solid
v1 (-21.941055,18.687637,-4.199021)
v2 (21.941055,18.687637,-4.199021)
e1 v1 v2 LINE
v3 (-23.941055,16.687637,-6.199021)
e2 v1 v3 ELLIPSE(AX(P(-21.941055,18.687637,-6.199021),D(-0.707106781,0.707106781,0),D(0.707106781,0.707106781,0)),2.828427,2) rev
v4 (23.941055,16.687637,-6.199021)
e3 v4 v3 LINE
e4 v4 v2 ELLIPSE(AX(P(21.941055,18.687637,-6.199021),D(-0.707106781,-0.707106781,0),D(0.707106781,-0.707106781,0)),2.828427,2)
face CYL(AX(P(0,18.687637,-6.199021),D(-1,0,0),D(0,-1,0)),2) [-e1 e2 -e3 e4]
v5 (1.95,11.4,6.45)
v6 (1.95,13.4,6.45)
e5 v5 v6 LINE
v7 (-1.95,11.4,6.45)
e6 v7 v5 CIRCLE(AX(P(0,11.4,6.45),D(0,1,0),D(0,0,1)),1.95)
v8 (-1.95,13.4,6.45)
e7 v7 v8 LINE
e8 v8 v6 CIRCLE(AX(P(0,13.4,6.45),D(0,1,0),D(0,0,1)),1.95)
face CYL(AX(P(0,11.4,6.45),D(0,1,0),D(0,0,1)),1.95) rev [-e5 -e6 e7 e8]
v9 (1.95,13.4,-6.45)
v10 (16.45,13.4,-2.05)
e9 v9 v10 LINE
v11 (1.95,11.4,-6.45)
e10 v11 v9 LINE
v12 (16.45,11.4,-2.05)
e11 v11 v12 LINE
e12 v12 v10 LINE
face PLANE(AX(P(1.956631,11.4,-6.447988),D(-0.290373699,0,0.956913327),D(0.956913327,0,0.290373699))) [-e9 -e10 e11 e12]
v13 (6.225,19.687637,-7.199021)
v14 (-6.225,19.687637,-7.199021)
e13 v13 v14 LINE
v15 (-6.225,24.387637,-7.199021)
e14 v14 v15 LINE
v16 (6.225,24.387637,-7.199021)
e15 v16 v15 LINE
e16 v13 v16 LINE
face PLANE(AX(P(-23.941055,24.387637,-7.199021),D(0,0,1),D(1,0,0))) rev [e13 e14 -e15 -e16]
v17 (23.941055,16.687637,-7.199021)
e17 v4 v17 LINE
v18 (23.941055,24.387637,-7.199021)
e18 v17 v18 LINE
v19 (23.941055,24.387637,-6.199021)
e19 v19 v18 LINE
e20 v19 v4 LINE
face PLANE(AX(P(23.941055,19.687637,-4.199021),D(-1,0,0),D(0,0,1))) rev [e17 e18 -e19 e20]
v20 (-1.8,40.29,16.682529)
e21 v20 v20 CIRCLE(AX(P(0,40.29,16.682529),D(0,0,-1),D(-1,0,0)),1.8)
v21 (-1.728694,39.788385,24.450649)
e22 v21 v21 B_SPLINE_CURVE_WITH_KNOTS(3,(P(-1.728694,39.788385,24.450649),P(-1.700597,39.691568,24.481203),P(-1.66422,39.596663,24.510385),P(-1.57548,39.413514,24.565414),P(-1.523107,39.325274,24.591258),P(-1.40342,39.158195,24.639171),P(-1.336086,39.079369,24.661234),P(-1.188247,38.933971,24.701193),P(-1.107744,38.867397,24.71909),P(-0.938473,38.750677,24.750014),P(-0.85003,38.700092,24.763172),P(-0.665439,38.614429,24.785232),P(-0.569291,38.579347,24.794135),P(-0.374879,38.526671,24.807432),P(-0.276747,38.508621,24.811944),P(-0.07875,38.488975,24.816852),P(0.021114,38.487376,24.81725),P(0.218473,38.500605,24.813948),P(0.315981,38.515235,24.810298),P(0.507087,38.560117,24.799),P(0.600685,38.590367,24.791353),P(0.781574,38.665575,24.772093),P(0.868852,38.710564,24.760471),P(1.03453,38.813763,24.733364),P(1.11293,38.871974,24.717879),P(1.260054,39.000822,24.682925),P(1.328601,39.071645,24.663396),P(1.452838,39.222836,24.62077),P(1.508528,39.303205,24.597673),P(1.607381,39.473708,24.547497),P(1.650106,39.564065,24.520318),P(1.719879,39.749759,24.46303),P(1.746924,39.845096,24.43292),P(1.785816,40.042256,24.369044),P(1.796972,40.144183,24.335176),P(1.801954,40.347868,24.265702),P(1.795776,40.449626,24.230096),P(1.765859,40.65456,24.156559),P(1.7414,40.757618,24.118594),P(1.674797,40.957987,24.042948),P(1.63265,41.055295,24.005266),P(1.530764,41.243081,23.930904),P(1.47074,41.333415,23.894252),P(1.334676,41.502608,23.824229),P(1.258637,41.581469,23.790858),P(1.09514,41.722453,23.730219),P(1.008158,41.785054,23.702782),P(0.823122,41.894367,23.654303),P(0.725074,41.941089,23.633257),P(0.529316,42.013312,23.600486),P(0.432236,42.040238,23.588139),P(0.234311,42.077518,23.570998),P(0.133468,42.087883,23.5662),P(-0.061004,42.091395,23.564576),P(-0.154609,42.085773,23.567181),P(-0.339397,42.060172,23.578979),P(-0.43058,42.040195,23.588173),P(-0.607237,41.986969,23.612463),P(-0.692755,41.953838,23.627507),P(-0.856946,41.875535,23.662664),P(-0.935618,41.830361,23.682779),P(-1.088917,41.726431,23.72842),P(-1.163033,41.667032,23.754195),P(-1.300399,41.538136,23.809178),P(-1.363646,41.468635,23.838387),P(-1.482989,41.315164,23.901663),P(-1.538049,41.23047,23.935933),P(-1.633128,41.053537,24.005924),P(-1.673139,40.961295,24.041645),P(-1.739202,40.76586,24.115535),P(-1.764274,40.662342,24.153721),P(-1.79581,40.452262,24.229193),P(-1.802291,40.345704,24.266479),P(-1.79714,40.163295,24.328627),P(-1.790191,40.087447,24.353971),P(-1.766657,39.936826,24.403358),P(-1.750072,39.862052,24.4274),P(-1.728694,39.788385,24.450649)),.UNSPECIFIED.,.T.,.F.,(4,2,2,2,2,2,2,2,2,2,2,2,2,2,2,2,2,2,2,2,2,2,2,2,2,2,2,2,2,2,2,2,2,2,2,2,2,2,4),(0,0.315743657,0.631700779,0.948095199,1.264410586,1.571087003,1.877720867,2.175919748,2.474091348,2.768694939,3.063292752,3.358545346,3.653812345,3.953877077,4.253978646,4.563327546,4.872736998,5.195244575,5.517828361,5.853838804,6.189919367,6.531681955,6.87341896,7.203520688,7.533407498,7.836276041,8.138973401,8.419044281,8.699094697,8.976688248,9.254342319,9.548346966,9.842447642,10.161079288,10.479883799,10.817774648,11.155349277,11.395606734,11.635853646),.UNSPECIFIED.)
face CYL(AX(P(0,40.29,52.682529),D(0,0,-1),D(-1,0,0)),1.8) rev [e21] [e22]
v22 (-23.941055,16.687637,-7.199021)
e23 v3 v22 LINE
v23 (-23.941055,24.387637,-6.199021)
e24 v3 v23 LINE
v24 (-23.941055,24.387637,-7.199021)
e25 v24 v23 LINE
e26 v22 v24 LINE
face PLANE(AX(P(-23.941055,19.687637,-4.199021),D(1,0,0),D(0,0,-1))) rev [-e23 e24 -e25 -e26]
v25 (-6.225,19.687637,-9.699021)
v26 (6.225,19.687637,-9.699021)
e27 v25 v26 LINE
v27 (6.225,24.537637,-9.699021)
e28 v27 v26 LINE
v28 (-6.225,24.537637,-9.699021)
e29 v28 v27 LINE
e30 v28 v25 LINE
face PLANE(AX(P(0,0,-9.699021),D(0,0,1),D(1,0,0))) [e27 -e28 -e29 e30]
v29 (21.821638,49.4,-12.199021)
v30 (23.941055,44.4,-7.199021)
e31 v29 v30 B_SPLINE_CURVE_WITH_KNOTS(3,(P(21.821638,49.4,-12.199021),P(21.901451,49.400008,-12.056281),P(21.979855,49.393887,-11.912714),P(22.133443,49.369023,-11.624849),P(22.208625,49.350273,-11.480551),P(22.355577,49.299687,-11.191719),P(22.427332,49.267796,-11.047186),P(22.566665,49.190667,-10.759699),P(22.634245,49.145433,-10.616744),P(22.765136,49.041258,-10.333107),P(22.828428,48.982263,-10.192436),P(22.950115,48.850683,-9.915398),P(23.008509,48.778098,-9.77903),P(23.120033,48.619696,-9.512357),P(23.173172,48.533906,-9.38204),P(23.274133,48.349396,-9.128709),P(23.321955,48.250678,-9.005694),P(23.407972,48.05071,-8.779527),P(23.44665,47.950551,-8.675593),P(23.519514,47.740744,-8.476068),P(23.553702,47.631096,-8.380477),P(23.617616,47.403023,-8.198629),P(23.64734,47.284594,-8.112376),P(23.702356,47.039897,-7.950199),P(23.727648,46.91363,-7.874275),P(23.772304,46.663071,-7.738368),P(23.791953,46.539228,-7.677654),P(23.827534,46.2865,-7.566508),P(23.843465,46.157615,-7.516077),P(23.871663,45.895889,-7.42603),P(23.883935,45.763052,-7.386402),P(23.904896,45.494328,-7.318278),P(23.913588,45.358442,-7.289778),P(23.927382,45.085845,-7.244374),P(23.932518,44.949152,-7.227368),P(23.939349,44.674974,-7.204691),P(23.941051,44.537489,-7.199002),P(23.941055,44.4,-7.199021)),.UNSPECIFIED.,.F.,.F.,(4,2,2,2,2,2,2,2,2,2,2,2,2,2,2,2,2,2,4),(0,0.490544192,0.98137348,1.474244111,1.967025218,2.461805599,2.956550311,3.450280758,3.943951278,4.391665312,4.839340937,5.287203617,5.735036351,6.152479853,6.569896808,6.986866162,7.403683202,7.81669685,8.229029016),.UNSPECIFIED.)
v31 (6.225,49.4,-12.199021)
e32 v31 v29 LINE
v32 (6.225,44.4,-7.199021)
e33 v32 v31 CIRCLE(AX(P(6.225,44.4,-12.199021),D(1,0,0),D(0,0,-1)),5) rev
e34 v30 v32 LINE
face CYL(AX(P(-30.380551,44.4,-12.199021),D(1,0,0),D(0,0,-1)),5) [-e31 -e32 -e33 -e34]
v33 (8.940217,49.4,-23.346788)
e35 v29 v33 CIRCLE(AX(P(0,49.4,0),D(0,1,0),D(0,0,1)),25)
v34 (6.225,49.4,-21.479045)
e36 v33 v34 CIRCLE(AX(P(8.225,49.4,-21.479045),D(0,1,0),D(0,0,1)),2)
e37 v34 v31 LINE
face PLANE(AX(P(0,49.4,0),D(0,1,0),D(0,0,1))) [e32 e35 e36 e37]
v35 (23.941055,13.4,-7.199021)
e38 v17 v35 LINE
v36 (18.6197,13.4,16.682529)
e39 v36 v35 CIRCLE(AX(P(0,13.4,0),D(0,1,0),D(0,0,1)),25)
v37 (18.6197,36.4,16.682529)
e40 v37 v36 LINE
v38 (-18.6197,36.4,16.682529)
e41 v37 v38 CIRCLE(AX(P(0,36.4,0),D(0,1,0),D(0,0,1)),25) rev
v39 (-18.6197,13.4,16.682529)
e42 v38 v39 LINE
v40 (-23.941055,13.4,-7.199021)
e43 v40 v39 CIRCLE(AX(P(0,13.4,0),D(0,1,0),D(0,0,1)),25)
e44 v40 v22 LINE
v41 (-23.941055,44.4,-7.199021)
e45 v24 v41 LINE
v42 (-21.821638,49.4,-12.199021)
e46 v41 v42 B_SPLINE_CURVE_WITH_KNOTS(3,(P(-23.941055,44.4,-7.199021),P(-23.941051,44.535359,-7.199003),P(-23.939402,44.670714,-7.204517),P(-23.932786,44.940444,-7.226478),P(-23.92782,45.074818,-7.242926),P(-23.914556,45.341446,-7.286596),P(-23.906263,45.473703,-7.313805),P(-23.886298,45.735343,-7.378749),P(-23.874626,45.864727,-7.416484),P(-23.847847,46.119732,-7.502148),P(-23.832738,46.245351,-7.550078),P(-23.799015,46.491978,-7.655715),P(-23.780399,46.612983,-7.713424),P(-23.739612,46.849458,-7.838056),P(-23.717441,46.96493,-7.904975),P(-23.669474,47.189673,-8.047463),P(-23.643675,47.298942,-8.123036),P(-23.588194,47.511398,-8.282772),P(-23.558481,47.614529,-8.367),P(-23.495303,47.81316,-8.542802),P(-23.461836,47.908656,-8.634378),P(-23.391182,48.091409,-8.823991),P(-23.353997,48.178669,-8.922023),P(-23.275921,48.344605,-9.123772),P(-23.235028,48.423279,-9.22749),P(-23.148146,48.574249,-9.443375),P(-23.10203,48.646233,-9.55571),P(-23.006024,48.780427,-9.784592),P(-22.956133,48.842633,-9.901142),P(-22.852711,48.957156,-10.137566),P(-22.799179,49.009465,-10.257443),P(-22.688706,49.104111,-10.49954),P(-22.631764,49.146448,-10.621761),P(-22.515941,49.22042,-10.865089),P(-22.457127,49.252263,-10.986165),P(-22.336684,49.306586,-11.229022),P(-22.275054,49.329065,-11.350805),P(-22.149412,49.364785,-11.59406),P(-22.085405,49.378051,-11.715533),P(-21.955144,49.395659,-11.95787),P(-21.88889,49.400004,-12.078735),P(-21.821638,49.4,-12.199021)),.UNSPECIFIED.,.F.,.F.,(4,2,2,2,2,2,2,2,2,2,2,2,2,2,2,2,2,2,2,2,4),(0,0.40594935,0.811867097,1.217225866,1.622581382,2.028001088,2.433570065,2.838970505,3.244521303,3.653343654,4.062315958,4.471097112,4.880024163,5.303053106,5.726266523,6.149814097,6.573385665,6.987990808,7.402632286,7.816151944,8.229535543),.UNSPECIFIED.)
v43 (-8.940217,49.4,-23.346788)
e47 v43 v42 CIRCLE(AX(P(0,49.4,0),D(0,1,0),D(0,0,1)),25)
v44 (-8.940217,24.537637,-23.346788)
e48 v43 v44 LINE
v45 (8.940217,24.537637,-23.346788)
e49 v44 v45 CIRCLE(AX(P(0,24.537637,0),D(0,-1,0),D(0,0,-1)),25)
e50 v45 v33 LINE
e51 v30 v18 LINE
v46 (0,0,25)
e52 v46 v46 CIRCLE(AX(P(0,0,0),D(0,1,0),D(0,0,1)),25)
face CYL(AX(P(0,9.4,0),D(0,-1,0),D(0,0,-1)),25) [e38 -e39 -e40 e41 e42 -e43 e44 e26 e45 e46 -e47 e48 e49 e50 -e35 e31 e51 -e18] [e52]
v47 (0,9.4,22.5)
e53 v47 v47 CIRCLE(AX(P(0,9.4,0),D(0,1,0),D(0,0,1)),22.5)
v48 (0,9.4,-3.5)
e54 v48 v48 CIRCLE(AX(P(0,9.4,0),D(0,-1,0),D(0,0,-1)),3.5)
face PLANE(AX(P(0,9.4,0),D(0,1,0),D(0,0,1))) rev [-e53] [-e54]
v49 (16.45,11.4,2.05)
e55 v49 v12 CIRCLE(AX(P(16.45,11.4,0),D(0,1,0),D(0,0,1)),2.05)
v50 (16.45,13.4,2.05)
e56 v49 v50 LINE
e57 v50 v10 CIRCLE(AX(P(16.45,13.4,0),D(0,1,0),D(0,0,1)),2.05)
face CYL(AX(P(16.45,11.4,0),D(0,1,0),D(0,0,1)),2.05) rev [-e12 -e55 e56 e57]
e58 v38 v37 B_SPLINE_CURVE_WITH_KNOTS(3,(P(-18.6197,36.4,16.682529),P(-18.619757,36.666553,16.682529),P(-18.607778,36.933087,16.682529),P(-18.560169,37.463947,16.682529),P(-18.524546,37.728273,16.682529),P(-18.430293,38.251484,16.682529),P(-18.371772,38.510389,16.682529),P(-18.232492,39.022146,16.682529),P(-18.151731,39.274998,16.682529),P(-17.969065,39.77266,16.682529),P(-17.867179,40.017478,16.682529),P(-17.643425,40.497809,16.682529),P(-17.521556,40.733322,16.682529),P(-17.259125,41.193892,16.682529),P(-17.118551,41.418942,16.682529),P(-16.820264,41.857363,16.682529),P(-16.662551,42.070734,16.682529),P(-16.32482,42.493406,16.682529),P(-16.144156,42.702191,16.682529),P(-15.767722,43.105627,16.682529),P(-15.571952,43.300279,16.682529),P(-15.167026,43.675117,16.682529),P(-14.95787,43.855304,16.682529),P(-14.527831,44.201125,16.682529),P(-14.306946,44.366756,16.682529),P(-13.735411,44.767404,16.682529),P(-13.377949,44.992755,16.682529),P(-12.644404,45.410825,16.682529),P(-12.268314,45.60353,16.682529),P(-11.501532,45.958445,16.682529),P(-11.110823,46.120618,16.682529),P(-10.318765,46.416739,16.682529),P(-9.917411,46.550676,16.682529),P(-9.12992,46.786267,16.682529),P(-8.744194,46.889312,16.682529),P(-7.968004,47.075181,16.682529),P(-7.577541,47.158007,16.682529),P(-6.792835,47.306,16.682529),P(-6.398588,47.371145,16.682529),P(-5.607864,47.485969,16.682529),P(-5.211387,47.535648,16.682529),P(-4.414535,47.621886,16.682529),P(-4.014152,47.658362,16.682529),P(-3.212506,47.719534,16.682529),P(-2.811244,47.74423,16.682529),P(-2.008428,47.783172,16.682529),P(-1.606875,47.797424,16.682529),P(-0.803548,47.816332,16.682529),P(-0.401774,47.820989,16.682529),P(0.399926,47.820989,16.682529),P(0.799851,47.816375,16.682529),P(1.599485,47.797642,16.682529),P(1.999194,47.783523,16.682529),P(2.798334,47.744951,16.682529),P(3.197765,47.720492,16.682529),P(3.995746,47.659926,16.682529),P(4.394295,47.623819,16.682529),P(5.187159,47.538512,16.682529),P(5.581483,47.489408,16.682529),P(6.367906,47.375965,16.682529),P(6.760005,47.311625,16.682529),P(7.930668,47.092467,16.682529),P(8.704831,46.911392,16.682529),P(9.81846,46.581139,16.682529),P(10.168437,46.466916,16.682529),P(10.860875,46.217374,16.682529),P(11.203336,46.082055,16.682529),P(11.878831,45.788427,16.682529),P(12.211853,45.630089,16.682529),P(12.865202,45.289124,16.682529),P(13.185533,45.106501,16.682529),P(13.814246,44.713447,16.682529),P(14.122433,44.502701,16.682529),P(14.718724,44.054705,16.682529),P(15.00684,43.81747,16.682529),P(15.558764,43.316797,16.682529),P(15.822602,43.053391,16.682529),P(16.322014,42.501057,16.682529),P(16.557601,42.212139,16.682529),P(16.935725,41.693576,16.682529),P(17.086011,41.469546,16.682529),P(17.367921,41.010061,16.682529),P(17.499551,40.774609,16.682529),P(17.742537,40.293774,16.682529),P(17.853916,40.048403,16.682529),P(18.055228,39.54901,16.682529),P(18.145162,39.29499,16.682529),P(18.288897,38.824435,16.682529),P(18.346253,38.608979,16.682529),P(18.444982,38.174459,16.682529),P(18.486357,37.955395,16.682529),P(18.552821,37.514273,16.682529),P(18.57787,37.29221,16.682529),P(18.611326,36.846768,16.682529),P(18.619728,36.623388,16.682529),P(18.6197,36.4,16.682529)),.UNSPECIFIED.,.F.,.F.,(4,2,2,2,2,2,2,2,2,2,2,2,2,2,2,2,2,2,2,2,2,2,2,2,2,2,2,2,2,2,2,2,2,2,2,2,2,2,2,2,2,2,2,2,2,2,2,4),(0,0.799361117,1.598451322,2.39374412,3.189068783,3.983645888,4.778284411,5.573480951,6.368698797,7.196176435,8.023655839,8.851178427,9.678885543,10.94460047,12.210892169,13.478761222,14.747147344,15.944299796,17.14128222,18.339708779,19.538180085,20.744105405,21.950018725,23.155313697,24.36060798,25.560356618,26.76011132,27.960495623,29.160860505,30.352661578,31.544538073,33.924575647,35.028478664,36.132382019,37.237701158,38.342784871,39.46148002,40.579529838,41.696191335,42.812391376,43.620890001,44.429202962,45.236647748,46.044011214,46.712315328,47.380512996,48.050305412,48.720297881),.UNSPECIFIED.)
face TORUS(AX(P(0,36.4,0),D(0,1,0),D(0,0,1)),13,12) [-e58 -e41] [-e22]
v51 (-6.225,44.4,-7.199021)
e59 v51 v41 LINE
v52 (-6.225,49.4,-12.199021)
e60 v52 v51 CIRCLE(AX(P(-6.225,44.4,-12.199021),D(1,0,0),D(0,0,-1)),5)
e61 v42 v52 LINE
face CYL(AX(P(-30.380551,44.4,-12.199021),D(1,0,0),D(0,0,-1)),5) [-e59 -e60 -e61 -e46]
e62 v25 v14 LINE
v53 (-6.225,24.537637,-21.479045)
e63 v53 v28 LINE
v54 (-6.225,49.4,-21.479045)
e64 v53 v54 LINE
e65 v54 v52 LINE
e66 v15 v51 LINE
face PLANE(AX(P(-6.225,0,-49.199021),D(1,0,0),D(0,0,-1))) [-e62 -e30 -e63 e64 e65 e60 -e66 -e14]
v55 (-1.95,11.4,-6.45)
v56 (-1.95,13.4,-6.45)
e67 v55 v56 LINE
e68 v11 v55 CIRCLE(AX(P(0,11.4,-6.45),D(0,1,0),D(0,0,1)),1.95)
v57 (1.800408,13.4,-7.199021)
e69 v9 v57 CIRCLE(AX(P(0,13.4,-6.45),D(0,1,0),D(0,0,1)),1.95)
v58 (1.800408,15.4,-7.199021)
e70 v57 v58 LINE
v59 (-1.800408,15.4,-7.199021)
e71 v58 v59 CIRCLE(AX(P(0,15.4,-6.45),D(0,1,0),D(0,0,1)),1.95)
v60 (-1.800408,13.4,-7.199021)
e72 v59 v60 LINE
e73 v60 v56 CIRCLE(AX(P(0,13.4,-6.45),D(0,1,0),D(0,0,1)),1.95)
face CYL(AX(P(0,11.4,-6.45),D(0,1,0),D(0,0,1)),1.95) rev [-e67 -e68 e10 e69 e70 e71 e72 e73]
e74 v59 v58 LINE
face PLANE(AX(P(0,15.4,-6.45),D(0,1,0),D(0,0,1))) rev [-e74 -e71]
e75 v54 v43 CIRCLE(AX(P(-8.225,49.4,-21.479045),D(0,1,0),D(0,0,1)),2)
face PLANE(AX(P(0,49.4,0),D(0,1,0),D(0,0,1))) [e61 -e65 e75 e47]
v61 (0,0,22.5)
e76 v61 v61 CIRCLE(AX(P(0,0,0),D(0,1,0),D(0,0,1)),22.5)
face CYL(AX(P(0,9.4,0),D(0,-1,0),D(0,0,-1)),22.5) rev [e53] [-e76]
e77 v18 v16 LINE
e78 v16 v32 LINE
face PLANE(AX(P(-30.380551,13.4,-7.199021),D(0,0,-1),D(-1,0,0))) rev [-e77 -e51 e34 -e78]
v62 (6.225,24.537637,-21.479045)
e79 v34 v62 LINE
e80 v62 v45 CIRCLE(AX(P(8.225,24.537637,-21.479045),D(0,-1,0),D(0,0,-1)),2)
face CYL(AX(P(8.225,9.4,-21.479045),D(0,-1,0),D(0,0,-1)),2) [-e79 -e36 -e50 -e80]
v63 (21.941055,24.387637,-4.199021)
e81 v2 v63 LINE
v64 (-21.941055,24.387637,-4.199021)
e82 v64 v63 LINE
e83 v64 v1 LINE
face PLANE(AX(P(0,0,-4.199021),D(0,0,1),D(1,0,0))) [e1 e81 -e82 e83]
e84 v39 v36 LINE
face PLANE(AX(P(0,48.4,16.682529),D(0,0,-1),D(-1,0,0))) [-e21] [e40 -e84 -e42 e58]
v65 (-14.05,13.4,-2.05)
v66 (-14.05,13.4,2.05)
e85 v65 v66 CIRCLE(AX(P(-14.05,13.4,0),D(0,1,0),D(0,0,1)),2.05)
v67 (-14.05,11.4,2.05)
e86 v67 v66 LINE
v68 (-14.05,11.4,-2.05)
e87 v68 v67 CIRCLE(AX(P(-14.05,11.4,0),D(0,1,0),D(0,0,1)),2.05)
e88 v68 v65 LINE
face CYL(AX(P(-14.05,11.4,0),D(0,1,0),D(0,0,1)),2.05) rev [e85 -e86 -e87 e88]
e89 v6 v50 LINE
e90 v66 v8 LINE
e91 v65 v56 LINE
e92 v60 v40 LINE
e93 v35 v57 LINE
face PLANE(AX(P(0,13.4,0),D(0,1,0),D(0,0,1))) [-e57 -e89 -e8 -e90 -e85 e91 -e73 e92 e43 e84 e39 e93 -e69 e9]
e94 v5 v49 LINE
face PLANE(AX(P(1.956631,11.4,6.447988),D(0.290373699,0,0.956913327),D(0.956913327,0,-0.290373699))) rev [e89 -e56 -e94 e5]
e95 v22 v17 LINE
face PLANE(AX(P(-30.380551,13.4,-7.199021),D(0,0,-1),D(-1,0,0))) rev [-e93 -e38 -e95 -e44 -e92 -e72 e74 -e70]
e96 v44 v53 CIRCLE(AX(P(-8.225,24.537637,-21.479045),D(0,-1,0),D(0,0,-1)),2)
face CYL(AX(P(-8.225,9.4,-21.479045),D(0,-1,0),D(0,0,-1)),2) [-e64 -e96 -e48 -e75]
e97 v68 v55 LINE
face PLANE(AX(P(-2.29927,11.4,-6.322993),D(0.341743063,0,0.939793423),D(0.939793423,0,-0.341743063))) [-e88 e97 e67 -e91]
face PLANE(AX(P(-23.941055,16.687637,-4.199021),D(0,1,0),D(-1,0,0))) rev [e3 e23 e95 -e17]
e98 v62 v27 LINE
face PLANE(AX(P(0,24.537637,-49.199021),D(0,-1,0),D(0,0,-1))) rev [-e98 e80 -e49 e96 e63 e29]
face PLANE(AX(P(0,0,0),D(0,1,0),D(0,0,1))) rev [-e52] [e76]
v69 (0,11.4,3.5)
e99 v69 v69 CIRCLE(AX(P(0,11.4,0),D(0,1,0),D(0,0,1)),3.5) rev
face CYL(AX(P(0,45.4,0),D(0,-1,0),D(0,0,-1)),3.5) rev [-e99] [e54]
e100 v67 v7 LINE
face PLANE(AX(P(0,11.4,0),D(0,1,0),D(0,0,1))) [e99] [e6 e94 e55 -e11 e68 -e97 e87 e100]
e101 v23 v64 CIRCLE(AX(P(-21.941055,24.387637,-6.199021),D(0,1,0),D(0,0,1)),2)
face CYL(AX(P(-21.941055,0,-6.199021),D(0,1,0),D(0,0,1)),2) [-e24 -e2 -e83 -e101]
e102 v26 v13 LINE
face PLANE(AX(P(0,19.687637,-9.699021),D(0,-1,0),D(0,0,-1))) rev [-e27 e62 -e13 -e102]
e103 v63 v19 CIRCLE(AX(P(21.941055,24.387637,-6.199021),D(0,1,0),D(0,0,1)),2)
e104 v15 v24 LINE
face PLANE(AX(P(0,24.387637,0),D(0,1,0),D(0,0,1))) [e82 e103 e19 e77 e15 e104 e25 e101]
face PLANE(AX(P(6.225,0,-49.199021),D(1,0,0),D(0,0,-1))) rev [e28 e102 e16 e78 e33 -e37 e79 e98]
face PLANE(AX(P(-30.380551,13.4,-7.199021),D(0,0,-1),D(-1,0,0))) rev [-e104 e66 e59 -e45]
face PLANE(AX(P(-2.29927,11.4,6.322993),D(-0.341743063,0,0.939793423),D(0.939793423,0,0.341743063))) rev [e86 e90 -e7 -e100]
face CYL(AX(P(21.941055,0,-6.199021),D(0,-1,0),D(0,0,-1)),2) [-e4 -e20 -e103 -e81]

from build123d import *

# Parameters (mm, degrees)
SKETCH1_R           = 25
SKETCH1_R_2         = 22.5
BOSS_EXTRUDE1_DEPTH = 9.4
SKETCH2_R           = 25
BOSS_EXTRUDE2_DEPTH = 40
SKETCH3_W           = 55.38055132
SKETCH3_H           = 33.998264421
CUT_EXTRUDE1_DEPTH  = 36
SKETCH4_R           = 3.5
CUT_EXTRUDE2_DEPTH  = 36
CUT_EXTRUDE3_START  = -2
SKETCH5_R           = 3.5
SKETCH5_R_2         = 2.05
SKETCH5_R_3         = 1.95
CUT_EXTRUDE3_DEPTH  = 2
SKETCH5_3_R         = 1.95
CUT_EXTRUDE4_DEPTH  = 2
SKETCH6_W           = 12.45
SKETCH6_H           = 22.55
CUT_EXTRUDE5_DEPTH  = 42
SKETCH6_4_W         = 12.45
SKETCH6_4_H         = 4.85
CUT_EXTRUDE6_DEPTH  = 2.5
SKETCH6_5_W         = 12.45
SKETCH6_5_H         = 2.312362619
CUT_EXTRUDE7_DEPTH  = 28.5
SKETCH7_W           = 47.88210926
SKETCH7_H           = 3
BOSS_EXTRUDE3_DEPTH = 3
SKETCH8_W           = 47.88210926
SKETCH8_H           = 3
BOSS_EXTRUDE4_DEPTH = 4.7
FILLET1_R           = 5
FILLET2_R           = 2
FILLET3_R           = 2
BOSS_EXTRUDE5_DEPTH = 35
FILLET4_R           = 12
SKETCH10_R          = 1.8
CUT_EXTRUDE8_DEPTH  = 36


with BuildPart() as part:
    # Sketch1 → Boss-Extrude1 (new body)
    with BuildSketch(Plane(origin=(0, 0, 0), x_dir=(1, 0, 0), z_dir=(0, 1, 0))):
        with Locations(Location((0, 0, 0), (0, 0, 270))):
            Circle(SKETCH1_R)
        with Locations(Location((0, 0, 0), (0, 0, 270))):
            Circle(SKETCH1_R_2, mode=Mode.SUBTRACT)
    extrude(amount=BOSS_EXTRUDE1_DEPTH)

    # Sketch2 → Boss-Extrude2 (add)
    with BuildSketch(Plane(origin=(0, 9.4, 0), x_dir=(1, 0, 0), z_dir=(0, 1, 0))):
        with Locations(Location((0, 0, 0), (0, 0, 270))):
            Circle(SKETCH2_R)
    extrude(amount=BOSS_EXTRUDE2_DEPTH)

    # Sketch3 → Cut-Extrude1 (cut)
    with BuildSketch(Plane(origin=(0, 49.4, 0), x_dir=(1, 0, 0), z_dir=(0, 1, 0))):
        with Locations((-2.69027566, -9.800111221)):
            Rectangle(SKETCH3_W, SKETCH3_H)
    extrude(amount=-CUT_EXTRUDE1_DEPTH, mode=Mode.SUBTRACT)

    # Sketch4 → Cut-Extrude2 (cut)
    with BuildSketch(Plane.XZ.offset(-9.4)):
        with Locations(Location((0, 0, 0), (0, 0, 270))):
            Circle(SKETCH4_R)
    extrude(amount=-CUT_EXTRUDE2_DEPTH, mode=Mode.SUBTRACT)

    # Sketch5 → Cut-Extrude3 (cut)
    # profile 1 of 6: a face of its own
    with BuildSketch(Plane(origin=(0, 13.4, 0), x_dir=(1, 0, 0), z_dir=(0, 1, 0)).offset(CUT_EXTRUDE3_START)):
        with BuildLine():
            Line((-1.95, 6.45), (-14.05, 2.05))
            ThreePointArc((-14.05, 2.05), (-12.600431099, 1.449568901), (-12, 0))
            ThreePointArc((-12, 0), (-12.600431099, -1.449568901), (-14.05, -2.05))
            Line((-14.05, -2.05), (-1.95, -6.45))
            ThreePointArc((-1.95, -6.45), (0, -4.5), (1.95, -6.45))
            Line((1.95, -6.45), (16.45, -2.05))
            ThreePointArc((16.45, -2.05), (14.4, 0), (16.45, 2.05))
            Line((16.45, 2.05), (1.95, 6.45))
            ThreePointArc((1.95, 6.45), (0, 4.5), (-1.95, 6.45))
        make_face()
        with Locations(Location((0, 0, 0), (0, 0, 90))):
            Circle(SKETCH5_R, mode=Mode.SUBTRACT)
    # profile 2 of 6: a face of its own
    with BuildSketch(Plane(origin=(0, 13.4, 0), x_dir=(1, 0, 0), z_dir=(0, 1, 0)).offset(CUT_EXTRUDE3_START)):
        with BuildLine():
            ThreePointArc((-1.800407609, 7.199020989), (-1.912236235, 6.831906509), (-1.95, 6.45))
            ThreePointArc((-1.95, 6.45), (0, 4.5), (1.95, 6.45))
            ThreePointArc((1.95, 6.45), (1.912236235, 6.831906509), (1.800407609, 7.199020989))
            Line((1.800407609, 7.199020989), (-1.800407609, 7.199020989))
        make_face()
    # profile 3 of 6: a face of its own
    with BuildSketch(Plane(origin=(0, 13.4, 0), x_dir=(1, 0, 0), z_dir=(0, 1, 0)).offset(CUT_EXTRUDE3_START)):
        with BuildLine():
            ThreePointArc((1.800407609, 7.199020989), (0, 8.4), (-1.800407609, 7.199020989))
            Line((-1.800407609, 7.199020989), (1.800407609, 7.199020989))
        make_face()
    # profile 4 of 6: a face of its own
    with BuildSketch(Plane(origin=(0, 13.4, 0), x_dir=(1, 0, 0), z_dir=(0, 1, 0)).offset(CUT_EXTRUDE3_START)):
        with Locations((-14.05, 0)):
            Circle(SKETCH5_R_2)
    # profile 5 of 6: a face of its own
    with BuildSketch(Plane(origin=(0, 13.4, 0), x_dir=(1, 0, 0), z_dir=(0, 1, 0)).offset(CUT_EXTRUDE3_START)):
        with Locations((16.45, 0)):
            Circle(SKETCH5_R_2)
    # profile 6 of 6: a face of its own
    with BuildSketch(Plane(origin=(0, 13.4, 0), x_dir=(1, 0, 0), z_dir=(0, 1, 0)).offset(CUT_EXTRUDE3_START)):
        with Locations((0, -6.45)):
            Circle(SKETCH5_R_3)
    extrude(amount=CUT_EXTRUDE3_DEPTH, mode=Mode.SUBTRACT)

    # Sketch5<3> → Cut-Extrude4 (cut)
    with BuildSketch(Plane(origin=(0, 13.4, 0), x_dir=(1, 0, 0), z_dir=(0, 1, 0))):
        with Locations((0, 6.45)):
            Circle(SKETCH5_3_R)
    extrude(amount=CUT_EXTRUDE4_DEPTH, mode=Mode.SUBTRACT)

    # Sketch6 → Cut-Extrude5 (cut)
    with BuildSketch(Plane.XY.offset(-7.199020989)):
        with Locations((0, 35.812637381)):
            Rectangle(SKETCH6_W, SKETCH6_H)
    extrude(amount=-CUT_EXTRUDE5_DEPTH, mode=Mode.SUBTRACT)

    # Sketch6<4> → Cut-Extrude6 (cut)
    with BuildSketch(Plane.XY.offset(-7.199020989)):
        with Locations((0, 22.112637381)):
            Rectangle(SKETCH6_4_W, SKETCH6_4_H)
    extrude(amount=-CUT_EXTRUDE6_DEPTH, mode=Mode.SUBTRACT)

    # Sketch6<5> → Cut-Extrude7 (cut)
    with BuildSketch(Plane.XY.offset(-7.199020989)):
        with Locations((0, 48.243818691)):
            Rectangle(SKETCH6_5_W, SKETCH6_5_H)
    extrude(amount=-CUT_EXTRUDE7_DEPTH, mode=Mode.SUBTRACT)

    # Sketch7 → Boss-Extrude3 (add)
    with BuildSketch(Plane.XY.offset(-7.199020989)):
        with Locations((0, 18.187637381)):
            Rectangle(SKETCH7_W, SKETCH7_H)
    extrude(amount=BOSS_EXTRUDE3_DEPTH)

    # Sketch8 → Boss-Extrude4 (add)
    with BuildSketch(Plane(origin=(0, 19.687637381, 0), x_dir=(1, 0, 0), z_dir=(0, 1, 0))):
        with Locations((0, 5.699020989)):
            Rectangle(SKETCH8_W, SKETCH8_H)
    extrude(amount=BOSS_EXTRUDE4_DEPTH)

    # Fillet1
    fillet1_edges = [part.edges().sort_by_distance(p)[0] for p in [
        (-15.083027315, 49.4, -7.199020989),
        (15.083027315, 49.4, -7.199020989),
    ]]
    fillet(fillet1_edges, radius=FILLET1_R)

    # Fillet2
    fillet2_edges = [part.edges().sort_by_distance(p)[0] for p in [
        (6.225, 36.96881869, -24.212587119),
        (-6.225, 36.96881869, -24.212587119),
    ]]
    fillet(fillet2_edges, radius=FILLET2_R)

    # Fillet3
    fillet3_edges = [part.edges().sort_by_distance(p)[0] for p in [
        (-23.94105463, 20.537637381, -4.199020989),
        (0, 16.687637381, -4.199020989),
        (23.94105463, 20.537637381, -4.199020989),
    ]]
    fillet(fillet3_edges, radius=FILLET3_R)

    # Sketch9 → Boss-Extrude5 (add)
    with BuildSketch(Plane(origin=(0, 13.4, 0), x_dir=(1, 0, 0), z_dir=(0, 1, 0))):
        with BuildLine():
            Line((18.619699915, -16.682529037), (-18.619699915, -16.682529037))
            ThreePointArc((-18.619699915, -16.682529037), (0, -25), (18.619699915, -16.682529037))
        make_face()
    extrude(amount=BOSS_EXTRUDE5_DEPTH)

    # Fillet4
    # the kernel refuses this fillet: 12 mm, written as the material it takes off along each edge
    with BuildSketch(Plane(origin=(0, 48.4, 0), x_dir=(-0.8915807568580754, 0, -0.4528617382826481), z_dir=(0.4528617382826481, 0, -0.8915807568580754))) as fillet4_piece_1_section:
        with BuildLine():
            CenterArc((25 - FILLET4_R, -FILLET4_R), FILLET4_R, 0, 90)
            Line((25 - FILLET4_R, 0), (25, 0))
            Line((25, 0), (25, -FILLET4_R))
        make_face()
    fillet4_piece_1 = revolve(axis=Axis((0, 48.4, 0), (0, 1, 0)), revolution_arc=233.854877773, mode=Mode.PRIVATE)
    fillet4_piece_1 = split(fillet4_piece_1, bisect_by=Plane(origin=(0, 43.523140853, 16.682529037), z_dir=(0, 0, 1)), keep=Keep.TOP, mode=Mode.PRIVATE)
    add(fillet4_piece_1, mode=Mode.SUBTRACT)

    # Sketch10 → Cut-Extrude8 (cut)
    with BuildSketch(Plane(origin=(0, 0, 16.682529037), x_dir=(-1, 0, 0), z_dir=(0, 0, -1))):
        with Locations((0, 40.29)):
            Circle(SKETCH10_R)
    extrude(amount=-CUT_EXTRUDE8_DEPTH, mode=Mode.SUBTRACT)


solid = part.part
